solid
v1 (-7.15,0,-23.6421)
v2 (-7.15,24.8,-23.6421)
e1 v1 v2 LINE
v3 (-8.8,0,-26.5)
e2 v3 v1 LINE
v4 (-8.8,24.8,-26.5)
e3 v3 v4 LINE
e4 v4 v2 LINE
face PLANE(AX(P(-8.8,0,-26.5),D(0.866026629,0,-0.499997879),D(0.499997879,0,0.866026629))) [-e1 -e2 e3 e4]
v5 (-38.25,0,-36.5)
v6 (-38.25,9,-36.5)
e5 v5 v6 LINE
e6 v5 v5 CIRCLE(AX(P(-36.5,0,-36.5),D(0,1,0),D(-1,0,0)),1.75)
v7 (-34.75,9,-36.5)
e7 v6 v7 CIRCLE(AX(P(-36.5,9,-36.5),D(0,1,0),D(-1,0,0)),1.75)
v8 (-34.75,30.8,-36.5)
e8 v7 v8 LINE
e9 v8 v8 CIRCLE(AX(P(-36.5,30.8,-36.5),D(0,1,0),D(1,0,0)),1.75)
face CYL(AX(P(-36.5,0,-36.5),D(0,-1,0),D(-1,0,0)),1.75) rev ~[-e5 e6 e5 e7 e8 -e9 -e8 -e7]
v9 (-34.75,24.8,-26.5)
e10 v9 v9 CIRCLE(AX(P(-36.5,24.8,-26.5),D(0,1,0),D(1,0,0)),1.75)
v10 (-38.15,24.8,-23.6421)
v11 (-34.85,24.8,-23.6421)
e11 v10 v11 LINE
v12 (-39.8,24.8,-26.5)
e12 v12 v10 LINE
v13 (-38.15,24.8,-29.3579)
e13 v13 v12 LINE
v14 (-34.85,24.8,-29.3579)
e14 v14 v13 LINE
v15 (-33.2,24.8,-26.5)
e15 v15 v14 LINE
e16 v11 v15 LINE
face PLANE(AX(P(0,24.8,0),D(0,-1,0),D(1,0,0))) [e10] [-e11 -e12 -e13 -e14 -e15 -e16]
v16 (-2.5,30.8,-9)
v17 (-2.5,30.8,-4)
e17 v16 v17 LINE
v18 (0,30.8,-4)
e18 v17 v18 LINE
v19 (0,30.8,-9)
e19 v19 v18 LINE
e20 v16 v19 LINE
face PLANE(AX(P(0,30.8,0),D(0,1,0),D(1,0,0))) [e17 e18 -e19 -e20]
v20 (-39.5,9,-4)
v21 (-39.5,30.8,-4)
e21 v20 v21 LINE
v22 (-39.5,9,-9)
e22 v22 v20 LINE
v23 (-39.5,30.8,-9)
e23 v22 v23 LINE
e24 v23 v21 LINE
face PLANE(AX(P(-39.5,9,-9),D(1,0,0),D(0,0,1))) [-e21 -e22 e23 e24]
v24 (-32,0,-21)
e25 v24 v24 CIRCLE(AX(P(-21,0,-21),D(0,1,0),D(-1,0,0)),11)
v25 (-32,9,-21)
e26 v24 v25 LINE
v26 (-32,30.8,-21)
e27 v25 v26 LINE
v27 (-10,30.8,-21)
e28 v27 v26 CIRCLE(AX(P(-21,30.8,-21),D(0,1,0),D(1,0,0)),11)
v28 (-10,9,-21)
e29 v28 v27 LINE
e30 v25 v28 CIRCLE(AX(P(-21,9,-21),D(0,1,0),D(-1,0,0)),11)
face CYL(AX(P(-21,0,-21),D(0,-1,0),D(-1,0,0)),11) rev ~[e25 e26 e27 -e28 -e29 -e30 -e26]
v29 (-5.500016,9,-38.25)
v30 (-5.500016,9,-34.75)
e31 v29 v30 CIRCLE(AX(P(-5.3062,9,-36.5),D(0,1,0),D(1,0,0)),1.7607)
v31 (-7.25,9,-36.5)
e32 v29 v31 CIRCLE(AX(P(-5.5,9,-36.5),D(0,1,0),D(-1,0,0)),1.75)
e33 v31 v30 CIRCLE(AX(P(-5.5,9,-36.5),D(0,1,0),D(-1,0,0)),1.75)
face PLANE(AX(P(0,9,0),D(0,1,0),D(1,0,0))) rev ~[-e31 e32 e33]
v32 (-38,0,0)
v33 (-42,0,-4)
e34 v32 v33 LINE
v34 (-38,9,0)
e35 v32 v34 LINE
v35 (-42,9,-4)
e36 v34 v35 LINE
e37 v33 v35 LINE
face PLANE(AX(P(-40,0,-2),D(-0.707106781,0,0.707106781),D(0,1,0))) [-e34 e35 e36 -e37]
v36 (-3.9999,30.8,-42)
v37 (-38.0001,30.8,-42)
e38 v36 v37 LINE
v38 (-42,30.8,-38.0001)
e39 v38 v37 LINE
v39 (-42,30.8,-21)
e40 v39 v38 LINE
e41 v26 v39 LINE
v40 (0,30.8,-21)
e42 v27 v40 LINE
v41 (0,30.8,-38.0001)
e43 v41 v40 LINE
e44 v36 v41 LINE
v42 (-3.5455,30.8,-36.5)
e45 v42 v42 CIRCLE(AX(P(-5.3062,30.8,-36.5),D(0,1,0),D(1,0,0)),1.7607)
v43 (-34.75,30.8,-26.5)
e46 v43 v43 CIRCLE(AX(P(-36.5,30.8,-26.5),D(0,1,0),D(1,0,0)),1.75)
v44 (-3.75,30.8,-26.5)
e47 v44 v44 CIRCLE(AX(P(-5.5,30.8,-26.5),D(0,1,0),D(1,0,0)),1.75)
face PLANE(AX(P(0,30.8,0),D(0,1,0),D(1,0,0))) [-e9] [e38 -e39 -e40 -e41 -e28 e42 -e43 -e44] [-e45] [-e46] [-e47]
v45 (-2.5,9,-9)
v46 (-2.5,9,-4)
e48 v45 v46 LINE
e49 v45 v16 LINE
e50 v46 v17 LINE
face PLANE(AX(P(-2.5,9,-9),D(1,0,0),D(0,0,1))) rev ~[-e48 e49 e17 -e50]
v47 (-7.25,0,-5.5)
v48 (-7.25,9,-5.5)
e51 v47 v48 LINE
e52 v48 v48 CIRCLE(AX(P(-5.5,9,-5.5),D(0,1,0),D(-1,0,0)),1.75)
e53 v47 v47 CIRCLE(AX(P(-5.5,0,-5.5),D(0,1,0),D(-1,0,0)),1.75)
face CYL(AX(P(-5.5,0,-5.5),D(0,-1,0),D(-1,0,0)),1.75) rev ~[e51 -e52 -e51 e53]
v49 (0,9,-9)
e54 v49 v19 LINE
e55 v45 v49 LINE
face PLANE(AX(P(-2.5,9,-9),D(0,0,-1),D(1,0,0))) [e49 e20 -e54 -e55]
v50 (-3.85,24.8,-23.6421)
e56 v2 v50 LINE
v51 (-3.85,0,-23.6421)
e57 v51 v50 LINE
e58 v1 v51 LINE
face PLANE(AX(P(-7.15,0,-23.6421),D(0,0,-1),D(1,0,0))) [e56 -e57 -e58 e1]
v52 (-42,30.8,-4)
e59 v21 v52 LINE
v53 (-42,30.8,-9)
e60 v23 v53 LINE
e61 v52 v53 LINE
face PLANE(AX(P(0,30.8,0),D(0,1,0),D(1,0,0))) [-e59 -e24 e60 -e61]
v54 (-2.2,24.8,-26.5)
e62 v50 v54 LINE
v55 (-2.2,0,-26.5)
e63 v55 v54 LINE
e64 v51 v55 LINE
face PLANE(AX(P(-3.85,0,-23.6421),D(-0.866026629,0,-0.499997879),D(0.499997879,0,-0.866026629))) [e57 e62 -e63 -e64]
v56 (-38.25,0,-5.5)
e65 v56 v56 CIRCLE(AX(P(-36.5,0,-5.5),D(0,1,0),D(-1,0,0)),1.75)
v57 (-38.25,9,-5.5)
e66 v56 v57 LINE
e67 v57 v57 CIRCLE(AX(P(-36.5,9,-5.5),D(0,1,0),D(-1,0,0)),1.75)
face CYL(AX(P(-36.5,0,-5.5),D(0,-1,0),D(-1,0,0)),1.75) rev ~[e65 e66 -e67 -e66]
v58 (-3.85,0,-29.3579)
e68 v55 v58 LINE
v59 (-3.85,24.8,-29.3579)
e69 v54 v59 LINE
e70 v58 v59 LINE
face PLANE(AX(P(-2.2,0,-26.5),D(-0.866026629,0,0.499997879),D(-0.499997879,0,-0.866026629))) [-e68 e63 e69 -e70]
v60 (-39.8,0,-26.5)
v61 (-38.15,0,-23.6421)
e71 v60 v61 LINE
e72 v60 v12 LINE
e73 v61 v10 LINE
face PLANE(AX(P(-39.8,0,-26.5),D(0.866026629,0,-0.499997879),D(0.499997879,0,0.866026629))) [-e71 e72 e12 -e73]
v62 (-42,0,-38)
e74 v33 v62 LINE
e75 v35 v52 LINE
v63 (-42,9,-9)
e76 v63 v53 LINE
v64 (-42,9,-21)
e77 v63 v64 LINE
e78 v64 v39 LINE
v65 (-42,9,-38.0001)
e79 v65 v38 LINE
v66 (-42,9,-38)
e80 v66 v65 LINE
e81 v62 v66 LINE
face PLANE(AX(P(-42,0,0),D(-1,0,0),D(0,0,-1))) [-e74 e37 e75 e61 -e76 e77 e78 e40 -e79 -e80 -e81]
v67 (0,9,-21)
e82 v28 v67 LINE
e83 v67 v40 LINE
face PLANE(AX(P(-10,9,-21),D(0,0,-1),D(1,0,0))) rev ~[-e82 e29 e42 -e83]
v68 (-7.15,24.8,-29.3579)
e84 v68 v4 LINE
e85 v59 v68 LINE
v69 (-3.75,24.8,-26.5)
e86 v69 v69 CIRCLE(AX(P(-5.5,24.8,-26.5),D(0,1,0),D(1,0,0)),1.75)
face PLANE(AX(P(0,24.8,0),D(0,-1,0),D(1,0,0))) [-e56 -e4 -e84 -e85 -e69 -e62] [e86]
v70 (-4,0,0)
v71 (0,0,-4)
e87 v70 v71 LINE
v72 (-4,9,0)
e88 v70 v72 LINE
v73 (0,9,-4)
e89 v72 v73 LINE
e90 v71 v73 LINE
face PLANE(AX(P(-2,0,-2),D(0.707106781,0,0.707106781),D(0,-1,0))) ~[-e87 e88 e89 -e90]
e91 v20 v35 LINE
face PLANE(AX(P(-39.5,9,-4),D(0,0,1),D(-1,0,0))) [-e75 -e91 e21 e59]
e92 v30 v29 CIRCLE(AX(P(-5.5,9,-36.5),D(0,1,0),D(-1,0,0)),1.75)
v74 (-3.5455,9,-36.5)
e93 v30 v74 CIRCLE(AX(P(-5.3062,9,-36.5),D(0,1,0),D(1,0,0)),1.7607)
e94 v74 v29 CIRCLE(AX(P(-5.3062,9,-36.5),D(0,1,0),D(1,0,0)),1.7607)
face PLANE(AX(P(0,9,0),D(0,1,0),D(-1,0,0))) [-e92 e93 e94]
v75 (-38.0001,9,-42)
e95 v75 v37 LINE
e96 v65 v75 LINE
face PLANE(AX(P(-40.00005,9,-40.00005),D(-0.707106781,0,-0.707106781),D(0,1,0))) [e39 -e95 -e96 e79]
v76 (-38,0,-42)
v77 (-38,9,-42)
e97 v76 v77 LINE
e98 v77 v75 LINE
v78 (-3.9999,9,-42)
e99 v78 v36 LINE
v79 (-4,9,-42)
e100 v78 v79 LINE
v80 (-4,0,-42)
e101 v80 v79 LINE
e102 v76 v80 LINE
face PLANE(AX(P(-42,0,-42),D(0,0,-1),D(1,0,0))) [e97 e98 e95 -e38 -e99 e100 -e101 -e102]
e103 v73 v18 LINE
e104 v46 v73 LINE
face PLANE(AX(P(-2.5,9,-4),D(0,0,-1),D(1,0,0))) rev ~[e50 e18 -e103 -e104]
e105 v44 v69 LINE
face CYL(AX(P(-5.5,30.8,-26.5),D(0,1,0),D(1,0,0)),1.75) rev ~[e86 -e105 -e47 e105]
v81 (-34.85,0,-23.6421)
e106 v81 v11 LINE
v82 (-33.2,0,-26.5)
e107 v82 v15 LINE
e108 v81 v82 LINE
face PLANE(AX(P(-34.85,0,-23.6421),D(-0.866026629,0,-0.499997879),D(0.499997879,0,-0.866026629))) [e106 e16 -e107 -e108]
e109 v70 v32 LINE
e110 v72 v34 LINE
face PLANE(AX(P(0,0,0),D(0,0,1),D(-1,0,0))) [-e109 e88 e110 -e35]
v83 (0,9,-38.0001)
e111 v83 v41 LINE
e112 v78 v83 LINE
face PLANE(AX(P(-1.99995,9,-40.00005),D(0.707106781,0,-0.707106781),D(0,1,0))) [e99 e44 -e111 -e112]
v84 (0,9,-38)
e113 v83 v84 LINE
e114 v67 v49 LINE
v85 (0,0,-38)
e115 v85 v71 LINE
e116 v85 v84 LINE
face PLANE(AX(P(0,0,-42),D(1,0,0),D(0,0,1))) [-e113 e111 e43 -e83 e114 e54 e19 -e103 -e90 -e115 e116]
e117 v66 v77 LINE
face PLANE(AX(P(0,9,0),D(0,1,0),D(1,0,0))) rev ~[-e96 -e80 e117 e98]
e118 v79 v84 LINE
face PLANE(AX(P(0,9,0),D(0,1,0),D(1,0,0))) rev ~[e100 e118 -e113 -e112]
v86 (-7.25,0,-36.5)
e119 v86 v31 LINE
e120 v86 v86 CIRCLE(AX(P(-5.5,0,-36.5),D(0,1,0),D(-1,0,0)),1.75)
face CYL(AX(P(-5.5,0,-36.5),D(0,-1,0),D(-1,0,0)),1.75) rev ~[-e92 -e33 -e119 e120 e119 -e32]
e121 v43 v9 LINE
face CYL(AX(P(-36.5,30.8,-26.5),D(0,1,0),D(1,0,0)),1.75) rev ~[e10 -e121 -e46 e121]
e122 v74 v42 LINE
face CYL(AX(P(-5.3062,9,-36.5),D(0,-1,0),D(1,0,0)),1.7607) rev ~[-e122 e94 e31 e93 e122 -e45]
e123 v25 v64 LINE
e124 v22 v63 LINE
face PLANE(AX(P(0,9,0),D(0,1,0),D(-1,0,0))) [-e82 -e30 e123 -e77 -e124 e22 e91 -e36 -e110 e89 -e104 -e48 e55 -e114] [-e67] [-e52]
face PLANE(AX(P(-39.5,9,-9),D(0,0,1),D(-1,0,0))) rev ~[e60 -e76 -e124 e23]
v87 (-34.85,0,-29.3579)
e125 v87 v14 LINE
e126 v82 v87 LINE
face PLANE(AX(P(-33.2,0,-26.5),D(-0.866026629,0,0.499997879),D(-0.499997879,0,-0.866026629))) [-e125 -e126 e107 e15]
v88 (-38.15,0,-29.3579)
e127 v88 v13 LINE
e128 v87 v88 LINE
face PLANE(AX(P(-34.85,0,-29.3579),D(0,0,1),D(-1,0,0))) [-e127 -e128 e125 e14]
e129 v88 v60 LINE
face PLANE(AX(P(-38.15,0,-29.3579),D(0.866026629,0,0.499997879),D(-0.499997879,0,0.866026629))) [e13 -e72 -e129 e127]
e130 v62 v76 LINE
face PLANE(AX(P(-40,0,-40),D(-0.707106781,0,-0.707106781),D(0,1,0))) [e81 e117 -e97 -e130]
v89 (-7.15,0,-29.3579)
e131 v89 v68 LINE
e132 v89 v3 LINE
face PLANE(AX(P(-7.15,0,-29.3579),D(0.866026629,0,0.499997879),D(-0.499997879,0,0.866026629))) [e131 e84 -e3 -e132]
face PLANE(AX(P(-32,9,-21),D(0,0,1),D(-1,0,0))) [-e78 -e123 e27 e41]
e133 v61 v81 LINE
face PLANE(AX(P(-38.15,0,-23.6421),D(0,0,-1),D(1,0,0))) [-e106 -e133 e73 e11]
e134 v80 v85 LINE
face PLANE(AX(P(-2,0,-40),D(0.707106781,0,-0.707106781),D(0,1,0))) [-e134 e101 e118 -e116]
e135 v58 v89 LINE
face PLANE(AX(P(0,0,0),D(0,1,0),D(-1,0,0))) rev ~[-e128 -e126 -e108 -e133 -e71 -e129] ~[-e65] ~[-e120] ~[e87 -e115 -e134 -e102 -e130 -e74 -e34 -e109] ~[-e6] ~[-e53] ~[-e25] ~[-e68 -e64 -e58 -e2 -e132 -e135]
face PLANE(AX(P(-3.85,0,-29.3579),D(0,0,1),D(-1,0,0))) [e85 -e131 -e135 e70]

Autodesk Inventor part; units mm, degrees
ref_plane "YZ Plane" through (0, 0, 0) normal (1, 0, 0) x (0, 1, 0)
ref_plane "XZ Plane" through (0, 0, 0) normal (0, 1, 0) x (-1, 0, 0)
ref_plane "XY Plane" through (0, 0, 0) normal (0, 0, 1) x (1, 0, 0)
sketch "Sketch1" plane through (0, 0, 0) normal (0, 1, 0) x (-1, 0, 0)
  line L0 (0, 0) -> (42, 0)
  line L1 (42, 0) -> (42, -42)
  line L2 (42, -42) -> (0, -42)
  line L3 (0, -42) -> (0, 0)
  circle A0 centre (5.5, -5.5) radius 1.75
  circle A1 centre (5.5, -36.5) radius 1.75
  circle A2 centre (36.5, -5.5) radius 1.75
  circle A3 centre (36.5, -36.5) radius 1.75
  circle A4 centre (21, -21) radius 11
  point P0 (0, -31)
  point P1 (31, 0)
  point P2 (31, -31)
  dimension "d0" = 42
  dimension "d1" = 42
  dimension "d2" = 3.5
  dimension "d5" = 31
  dimension "d8" = 31
  dimension "d11" = 5.5
  dimension "d12" = 5.5
  dimension "d13" = 22
extrude "Extrusion1" add sketch "Sketch1" along normal blind 9
sketch "Sketch2" plane through (0, 9, 0) normal (0, 1, 0) x (1, 0, 0)
  line L0 (0, 42) -> (-42, 42) projected
  line L1 (-42, 4) -> (-42, 42)
  line L2 (-42, 42) -> (0, 42)
  line L3 (0, 42) -> (0, 4)
  circle A0 centre (-21, 21) radius 11 projected
  arc A1 (-10, 21) -> (-32, 21) centre (-21, 21) ccw
  line L4 (-42, 0) -> (0, 0) projected
  line L5 (-39.5, 9) -> (-39.5, 4)
  line L6 (-39.5, 4) -> (-42, 4)
  line L7 (-2.5, 9) -> (-2.5, 4)
  line L8 (-2.5, 4) -> (0, 4)
  circle A2 centre (-36.5, 36.5) radius 1.75 projected
  circle A3 centre (-36.5, 36.5) radius 1.75
  circle A4 centre (-5.3062, 36.5) radius 1.7607
  line L9 (0, 0) -> (-32, 0)
  line L10 (-39.5, 0) -> (-42, 0)
  line L11 (-2.5, 9) -> (0, 9)
  line L12 (-39.5, 9) -> (-42, 9)
  line L13 (-42, 42) -> (-42, 0) projected
  line L14 (-32, 21) -> (-42, 21)
  line L15 (-10, 21) -> (0, 21)
  point P0 (-42, 12)
  point P1 (0, 12)
  dimension "d19" = 4
  dimension "d20" = 2.5
  dimension "d25" = 2.5
  dimension "d34" = 5
  dimension "d36" = 5
  dimension "d37" = 4
chamfer "Chamfer1" distance 4 angle 45 4 edges at (0, 4.5, -42) (-42, 4.5, -42) (-42, 4.5, 0) (0, 4.5, 0)
extrude "Extrusion2" add sketch "Sketch2" along normal blind 21.8 contours L3 L15 A0 L14 L1 L0 | L1 L12 L5 L6 | L3 L8 L7 L11
chamfer "Chamfer5" distance 4 angle 45 1 edges at (-42, 19.9, -42)
chamfer "Chamfer6" distance 4 angle 45 1 edges at (0, 19.9, -42)
sketch "Sketch3" plane through (0, 30.8, 0) normal (0, 1, 0) x (1, 0, 0)
  circle A0 centre (-36.5, 26.5) radius 1.75
  circle A1 centre (-36.5, 36.5) radius 1.75 projected
  circle A2 centre (-5.5, 26.5) radius 1.75
  circle A3 centre (-5.3062, 36.5) radius 1.7607 projected
  point P0 (0, 0)
  dimension "d48" = 3.5
  dimension "d49" = 10
  dimension "d50" = 3.5
  dimension "d51" = 10
extrude "Extrusion3" cut sketch "Sketch3" against normal blind 30.8 contours A0 | A2
sketch "Sketch4" plane through (0, 0, 0) normal (0, -1, 0) x (1, 0, 0)
  circle A0 centre (-5.5, -26.5) radius 1.75 projected
  line L0 (-3.85, -29.3579) -> (-7.15, -29.3579)
  line L1 (-7.15, -29.3579) -> (-8.8, -26.5)
  line L2 (-8.8, -26.5) -> (-7.15, -23.6421)
  line L3 (-7.15, -23.6421) -> (-3.85, -23.6421)
  line L4 (-3.85, -23.6421) -> (-2.2, -26.5)
  line L5 (-2.2, -26.5) -> (-3.85, -29.3579)
  line L6 (-4, -42) -> (-38, -42) projected
  line L7 (-34.85, -29.3579) -> (-38.15, -29.3579)
  line L8 (-38.15, -29.3579) -> (-39.8, -26.5)
  line L9 (-39.8, -26.5) -> (-38.15, -23.6421)
  line L10 (-38.15, -23.6421) -> (-34.85, -23.6421)
  line L11 (-34.85, -23.6421) -> (-33.2, -26.5)
  line L12 (-33.2, -26.5) -> (-34.85, -29.3579)
  point P0 (0, 0)
  point P1 (-36.5, -26.5)
  point P2 (-36.5, -26.5)
  dimension "d55" = 5.7158
  dimension "d56" = 0
  dimension "d59" = 31
extrude "Extrusion4" cut sketch "Sketch4" against normal blind 24.8 contours A0 | L0 L1 L2 L3 L4 L5 | L7 L8 L9 L10 L11 L12
equation "\"d11\" = -0.5 * d5 + 0.5 * d1"
equation "\"d12\" = d11"
equation "\"d25\" = d20"
equation "\"d36\" = d34"
equation "\"d37\" = d19"
equation "\"d51\" = d49"
equation "\"d23\" = d19"
equation "\"d24\" = d22"
equation "\"d22\" = 12"
properties part number "Base for NEMA17"
